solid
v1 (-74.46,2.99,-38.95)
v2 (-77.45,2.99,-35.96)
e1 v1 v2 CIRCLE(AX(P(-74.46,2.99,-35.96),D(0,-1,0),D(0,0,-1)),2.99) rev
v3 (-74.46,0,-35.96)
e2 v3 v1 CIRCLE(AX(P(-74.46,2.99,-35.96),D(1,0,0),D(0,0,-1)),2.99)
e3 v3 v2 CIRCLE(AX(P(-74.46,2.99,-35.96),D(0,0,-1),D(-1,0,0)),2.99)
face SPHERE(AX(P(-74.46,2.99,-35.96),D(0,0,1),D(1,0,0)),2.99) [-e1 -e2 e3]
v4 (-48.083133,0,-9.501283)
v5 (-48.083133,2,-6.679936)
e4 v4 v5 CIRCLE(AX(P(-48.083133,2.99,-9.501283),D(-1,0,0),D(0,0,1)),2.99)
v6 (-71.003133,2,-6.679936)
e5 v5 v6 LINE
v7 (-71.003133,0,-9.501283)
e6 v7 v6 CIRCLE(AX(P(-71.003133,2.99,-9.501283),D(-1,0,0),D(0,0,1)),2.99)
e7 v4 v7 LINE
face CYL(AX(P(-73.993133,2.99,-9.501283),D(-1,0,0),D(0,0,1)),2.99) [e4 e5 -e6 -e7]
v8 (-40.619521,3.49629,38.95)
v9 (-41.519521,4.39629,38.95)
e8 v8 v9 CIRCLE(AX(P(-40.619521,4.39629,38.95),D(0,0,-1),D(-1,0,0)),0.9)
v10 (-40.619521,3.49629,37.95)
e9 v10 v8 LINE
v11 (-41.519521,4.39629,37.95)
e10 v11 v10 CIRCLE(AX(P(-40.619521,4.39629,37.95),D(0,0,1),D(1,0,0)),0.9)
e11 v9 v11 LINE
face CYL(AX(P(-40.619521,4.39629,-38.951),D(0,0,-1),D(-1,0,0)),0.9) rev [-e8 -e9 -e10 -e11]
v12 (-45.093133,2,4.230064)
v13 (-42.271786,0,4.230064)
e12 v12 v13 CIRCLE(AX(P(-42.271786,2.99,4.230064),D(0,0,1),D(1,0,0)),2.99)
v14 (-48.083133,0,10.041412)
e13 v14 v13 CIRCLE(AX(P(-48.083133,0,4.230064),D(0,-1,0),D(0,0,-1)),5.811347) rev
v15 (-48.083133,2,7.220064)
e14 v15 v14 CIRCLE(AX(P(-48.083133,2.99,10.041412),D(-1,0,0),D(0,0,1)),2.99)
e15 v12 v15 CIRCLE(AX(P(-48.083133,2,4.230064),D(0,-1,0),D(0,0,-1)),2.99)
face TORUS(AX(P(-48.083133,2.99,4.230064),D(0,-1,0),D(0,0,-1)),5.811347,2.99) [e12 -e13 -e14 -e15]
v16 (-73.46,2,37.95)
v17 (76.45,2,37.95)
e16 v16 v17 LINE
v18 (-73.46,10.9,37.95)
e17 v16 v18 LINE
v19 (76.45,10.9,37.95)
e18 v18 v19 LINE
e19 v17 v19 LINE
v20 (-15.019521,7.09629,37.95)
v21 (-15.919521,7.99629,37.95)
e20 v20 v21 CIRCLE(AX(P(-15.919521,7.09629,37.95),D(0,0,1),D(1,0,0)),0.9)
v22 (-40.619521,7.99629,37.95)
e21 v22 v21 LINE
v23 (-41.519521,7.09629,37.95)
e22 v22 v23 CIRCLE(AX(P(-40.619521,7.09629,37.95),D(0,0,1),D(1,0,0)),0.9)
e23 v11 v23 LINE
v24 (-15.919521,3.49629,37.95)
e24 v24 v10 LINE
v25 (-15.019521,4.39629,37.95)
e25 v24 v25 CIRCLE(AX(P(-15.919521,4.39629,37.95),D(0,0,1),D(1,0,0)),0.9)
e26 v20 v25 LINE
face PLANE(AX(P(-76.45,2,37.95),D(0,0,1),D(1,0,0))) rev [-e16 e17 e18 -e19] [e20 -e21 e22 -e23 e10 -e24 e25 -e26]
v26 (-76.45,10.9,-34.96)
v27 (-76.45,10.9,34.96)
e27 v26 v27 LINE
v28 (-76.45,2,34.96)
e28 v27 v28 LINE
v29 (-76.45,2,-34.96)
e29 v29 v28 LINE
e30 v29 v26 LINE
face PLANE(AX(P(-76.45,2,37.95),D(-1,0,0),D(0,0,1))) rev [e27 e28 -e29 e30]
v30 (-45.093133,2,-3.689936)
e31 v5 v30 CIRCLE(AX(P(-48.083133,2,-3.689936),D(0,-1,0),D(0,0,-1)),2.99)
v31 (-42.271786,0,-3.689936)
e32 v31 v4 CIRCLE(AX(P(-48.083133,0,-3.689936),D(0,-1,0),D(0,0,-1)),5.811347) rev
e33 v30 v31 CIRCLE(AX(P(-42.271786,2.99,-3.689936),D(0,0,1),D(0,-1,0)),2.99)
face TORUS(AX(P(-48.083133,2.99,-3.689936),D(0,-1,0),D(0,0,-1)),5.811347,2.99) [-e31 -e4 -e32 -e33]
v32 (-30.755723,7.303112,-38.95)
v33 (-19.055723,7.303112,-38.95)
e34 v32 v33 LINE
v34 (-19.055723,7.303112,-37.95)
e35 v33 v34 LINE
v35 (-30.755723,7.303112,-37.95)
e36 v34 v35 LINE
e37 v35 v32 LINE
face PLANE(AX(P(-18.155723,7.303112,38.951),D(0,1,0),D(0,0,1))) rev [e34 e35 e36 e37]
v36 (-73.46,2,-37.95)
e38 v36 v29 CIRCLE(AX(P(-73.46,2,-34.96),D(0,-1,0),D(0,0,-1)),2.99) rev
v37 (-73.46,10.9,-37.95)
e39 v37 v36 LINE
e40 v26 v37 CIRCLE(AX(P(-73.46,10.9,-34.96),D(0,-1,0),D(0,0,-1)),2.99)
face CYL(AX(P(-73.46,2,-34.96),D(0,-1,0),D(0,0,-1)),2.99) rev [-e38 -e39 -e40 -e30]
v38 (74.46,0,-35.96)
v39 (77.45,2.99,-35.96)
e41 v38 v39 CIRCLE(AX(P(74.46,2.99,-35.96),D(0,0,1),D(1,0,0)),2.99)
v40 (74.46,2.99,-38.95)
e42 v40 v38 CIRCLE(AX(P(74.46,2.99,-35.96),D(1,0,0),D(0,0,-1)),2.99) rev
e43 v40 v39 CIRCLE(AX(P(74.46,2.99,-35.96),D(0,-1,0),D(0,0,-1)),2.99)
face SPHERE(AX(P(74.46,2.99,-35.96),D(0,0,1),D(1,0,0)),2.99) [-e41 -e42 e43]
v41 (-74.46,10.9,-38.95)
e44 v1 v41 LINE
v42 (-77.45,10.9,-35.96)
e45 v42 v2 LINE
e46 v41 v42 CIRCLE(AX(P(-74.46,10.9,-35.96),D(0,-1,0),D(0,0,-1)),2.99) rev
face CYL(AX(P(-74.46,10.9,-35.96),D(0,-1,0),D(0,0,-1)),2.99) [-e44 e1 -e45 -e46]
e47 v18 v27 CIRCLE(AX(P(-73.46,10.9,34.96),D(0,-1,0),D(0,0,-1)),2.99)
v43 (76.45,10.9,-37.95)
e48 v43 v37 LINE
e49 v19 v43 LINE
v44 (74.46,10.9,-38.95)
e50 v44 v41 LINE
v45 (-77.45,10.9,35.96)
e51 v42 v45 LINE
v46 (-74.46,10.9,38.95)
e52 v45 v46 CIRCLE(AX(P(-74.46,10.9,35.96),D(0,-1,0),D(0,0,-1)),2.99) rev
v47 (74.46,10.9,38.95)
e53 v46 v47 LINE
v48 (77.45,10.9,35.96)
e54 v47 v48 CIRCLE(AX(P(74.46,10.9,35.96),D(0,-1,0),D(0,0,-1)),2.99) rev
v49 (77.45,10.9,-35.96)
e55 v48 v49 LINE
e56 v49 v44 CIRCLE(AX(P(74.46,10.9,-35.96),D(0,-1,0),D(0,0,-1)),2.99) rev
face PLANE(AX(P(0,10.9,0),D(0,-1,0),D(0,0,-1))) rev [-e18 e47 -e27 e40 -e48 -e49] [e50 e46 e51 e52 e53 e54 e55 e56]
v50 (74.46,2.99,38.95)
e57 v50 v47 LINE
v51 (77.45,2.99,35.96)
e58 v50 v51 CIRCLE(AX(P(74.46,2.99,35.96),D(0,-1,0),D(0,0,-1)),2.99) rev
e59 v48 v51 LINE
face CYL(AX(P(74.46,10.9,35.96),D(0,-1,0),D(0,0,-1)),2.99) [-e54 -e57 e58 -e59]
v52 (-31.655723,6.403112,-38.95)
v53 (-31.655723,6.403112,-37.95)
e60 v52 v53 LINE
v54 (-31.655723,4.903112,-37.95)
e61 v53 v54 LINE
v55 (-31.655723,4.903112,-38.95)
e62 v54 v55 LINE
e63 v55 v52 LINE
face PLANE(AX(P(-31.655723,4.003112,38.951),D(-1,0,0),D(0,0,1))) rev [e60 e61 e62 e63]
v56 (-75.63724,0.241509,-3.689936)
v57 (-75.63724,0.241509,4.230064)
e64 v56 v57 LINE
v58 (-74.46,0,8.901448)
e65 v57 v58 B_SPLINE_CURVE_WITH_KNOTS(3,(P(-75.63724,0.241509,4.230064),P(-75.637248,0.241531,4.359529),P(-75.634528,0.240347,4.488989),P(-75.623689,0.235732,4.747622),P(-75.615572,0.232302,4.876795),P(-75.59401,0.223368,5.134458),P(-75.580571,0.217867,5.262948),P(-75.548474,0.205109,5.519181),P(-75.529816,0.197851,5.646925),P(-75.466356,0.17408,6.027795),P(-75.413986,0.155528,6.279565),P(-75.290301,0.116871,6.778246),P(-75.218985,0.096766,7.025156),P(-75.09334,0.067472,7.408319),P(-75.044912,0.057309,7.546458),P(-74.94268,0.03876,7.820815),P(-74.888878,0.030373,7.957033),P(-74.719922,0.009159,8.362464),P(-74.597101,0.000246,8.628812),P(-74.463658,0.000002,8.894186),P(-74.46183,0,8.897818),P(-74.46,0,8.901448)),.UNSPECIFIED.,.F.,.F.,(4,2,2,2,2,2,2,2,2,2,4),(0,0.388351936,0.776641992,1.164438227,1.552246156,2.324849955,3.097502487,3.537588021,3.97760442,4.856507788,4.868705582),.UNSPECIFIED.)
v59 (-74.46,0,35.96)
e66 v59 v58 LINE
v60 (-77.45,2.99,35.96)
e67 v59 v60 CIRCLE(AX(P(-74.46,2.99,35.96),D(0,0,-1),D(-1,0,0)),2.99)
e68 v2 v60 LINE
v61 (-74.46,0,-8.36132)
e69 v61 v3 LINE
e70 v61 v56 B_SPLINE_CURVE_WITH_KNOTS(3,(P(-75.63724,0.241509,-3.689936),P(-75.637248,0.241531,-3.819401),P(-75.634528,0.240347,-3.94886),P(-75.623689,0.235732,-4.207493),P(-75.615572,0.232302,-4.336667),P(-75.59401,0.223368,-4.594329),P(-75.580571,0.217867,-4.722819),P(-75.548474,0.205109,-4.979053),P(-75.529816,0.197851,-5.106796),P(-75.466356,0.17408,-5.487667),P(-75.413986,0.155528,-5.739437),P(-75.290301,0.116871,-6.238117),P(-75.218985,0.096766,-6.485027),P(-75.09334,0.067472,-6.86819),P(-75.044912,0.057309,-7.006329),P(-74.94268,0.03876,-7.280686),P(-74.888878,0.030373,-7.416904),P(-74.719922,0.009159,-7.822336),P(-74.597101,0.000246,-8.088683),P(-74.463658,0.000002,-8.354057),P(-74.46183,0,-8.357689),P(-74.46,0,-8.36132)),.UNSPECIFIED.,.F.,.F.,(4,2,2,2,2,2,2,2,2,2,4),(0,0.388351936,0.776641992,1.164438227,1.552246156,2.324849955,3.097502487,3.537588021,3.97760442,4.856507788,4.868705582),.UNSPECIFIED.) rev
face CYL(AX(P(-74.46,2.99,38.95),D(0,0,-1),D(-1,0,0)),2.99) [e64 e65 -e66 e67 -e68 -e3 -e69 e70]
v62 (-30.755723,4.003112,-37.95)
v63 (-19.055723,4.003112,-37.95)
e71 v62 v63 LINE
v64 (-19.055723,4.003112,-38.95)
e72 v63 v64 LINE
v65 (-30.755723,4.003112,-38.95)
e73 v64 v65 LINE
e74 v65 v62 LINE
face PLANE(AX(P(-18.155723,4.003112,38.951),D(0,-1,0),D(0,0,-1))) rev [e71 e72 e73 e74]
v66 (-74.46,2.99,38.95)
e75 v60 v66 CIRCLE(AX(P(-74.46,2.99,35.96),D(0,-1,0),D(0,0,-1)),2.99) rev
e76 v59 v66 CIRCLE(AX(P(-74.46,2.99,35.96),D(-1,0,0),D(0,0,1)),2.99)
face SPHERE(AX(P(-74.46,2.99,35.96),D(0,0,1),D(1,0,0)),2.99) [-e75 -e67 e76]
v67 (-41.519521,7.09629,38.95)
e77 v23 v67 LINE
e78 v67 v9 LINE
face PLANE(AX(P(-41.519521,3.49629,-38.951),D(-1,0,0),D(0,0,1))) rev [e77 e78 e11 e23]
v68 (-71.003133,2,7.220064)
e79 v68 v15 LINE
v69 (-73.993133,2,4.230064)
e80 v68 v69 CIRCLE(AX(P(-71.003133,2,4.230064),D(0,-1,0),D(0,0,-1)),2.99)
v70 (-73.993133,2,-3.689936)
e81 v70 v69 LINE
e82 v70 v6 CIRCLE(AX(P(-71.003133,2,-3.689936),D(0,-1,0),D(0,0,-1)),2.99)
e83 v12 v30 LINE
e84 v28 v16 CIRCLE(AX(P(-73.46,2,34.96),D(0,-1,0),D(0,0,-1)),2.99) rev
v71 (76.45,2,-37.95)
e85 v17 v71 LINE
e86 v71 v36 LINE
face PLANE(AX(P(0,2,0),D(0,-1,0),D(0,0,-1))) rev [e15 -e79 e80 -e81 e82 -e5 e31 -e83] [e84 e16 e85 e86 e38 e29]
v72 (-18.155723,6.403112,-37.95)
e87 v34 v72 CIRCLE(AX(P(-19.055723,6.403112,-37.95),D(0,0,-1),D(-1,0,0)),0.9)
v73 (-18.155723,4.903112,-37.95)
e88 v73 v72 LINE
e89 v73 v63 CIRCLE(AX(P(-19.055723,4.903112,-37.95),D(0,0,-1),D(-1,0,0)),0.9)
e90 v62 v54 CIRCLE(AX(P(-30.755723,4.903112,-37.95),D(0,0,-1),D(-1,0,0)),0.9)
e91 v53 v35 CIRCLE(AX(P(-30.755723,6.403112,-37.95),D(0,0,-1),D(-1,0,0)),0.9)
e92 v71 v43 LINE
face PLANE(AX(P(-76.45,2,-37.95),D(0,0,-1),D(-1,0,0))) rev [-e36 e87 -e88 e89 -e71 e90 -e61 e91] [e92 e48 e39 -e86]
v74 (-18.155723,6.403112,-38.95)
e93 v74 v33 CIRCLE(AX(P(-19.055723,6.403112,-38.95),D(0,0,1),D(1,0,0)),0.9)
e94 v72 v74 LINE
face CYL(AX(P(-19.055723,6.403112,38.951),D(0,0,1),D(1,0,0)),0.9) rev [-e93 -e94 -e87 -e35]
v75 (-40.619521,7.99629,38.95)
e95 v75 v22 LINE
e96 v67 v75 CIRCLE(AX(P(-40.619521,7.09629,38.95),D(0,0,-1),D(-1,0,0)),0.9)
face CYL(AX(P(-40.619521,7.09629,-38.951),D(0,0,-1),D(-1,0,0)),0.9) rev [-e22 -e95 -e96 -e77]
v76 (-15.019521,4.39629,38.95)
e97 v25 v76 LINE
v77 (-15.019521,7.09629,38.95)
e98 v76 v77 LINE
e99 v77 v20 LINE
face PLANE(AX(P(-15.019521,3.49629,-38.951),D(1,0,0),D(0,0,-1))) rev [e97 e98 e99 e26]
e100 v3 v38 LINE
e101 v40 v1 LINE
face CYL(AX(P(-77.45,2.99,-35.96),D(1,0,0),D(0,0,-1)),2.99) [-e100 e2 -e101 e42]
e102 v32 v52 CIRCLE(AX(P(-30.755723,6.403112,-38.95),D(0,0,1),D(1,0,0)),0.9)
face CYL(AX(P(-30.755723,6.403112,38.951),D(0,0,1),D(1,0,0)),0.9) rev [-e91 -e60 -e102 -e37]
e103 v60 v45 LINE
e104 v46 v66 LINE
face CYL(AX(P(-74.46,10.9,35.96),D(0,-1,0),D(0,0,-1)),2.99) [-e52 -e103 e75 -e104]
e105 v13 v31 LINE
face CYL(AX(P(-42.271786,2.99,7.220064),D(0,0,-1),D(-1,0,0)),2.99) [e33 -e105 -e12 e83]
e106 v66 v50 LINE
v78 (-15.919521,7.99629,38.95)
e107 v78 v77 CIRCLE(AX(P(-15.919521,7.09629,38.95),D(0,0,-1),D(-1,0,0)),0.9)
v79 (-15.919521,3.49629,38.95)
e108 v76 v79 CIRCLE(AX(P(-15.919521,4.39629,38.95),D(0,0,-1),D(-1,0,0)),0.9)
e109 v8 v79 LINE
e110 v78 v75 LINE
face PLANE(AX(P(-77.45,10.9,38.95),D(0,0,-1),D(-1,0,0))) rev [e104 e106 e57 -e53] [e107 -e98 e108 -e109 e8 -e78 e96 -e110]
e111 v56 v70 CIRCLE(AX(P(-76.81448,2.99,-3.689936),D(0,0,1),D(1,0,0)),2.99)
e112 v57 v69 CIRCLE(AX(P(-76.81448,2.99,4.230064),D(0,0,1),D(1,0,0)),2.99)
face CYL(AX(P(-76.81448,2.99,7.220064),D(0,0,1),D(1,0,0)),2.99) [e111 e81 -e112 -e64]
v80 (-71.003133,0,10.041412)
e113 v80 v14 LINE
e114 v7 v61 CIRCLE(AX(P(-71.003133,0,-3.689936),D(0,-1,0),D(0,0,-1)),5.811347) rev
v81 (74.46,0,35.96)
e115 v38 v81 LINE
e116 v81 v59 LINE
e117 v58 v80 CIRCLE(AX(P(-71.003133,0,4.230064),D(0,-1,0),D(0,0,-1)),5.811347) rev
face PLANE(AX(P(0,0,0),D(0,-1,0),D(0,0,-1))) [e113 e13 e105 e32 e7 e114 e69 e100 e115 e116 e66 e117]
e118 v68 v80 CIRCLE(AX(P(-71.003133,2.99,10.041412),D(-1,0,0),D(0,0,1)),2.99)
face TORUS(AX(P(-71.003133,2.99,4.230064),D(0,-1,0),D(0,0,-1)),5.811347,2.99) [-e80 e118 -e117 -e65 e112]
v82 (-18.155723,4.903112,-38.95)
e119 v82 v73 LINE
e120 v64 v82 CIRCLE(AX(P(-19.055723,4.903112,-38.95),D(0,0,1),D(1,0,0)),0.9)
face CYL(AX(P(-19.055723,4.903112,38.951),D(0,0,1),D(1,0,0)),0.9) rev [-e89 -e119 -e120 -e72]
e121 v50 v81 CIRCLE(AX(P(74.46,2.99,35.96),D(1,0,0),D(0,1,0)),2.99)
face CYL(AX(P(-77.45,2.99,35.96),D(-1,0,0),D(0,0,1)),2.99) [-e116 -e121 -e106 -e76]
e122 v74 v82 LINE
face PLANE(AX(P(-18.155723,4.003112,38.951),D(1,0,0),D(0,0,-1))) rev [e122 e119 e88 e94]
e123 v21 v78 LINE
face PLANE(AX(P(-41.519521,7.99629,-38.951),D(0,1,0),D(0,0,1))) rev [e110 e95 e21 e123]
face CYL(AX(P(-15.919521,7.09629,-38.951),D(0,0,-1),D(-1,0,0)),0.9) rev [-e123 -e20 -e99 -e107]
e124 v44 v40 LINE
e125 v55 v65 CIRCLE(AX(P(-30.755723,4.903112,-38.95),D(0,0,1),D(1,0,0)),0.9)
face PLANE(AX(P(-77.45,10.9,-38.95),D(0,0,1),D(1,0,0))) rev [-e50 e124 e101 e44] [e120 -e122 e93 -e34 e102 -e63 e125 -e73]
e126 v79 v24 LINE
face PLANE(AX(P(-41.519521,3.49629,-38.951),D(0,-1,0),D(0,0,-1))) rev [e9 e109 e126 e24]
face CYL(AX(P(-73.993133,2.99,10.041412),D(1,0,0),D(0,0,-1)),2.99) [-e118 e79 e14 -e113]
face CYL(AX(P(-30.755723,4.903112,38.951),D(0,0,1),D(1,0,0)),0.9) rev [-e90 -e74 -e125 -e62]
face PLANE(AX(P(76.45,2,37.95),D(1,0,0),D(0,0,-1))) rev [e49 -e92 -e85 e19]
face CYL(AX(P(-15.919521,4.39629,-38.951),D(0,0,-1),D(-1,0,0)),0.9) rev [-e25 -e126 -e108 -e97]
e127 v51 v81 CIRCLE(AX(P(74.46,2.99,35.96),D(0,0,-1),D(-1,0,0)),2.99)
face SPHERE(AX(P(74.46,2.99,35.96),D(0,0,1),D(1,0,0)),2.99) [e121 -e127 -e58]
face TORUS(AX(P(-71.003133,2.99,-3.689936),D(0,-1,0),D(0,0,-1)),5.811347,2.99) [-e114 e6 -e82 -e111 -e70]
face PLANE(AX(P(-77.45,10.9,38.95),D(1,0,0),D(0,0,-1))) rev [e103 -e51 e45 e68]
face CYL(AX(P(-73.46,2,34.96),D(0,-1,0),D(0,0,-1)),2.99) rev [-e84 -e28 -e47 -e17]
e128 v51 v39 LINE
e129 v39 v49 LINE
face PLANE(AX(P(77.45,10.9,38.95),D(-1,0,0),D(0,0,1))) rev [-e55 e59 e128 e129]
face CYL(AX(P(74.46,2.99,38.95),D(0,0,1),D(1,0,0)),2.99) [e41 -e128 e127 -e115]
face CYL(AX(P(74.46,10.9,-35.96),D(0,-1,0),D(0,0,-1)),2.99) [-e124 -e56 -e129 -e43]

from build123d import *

# Parameters (mm, degrees)
SKETCH1_W           = 154.9
SKETCH1_H           = 77.9
BOSS_EXTRUDE1_DEPTH = 10.9
SKETCH8_W           = 152.9
SKETCH8_H           = 75.9
CUT_EXTRUDE3_DEPTH  = 8.9
FILLET6_R           = 2.99
FILLET7_R           = 2.99
FILLET8_R           = 2.99
FILLET9_R           = 2.99
FILLET10_R          = 2.99
FILLET11_R          = 2.99
FILLET12_R          = 2.99
FILLET13_R          = 2.99
SKETCH12_W          = 28.9
SKETCH12_H          = 13.9
CUT_EXTRUDE4_DEPTH  = 88.148235782
FILLET15_R          = 2.99
FILLET16_R          = 2.99
FILLET17_R          = 2.99
FILLET18_R          = 2.99
CUT_EXTRUDE8_REACH  = 112.389
SKETCH15_W          = 26.5
SKETCH15_H          = 4.5
CUT_EXTRUDE9_REACH  = 112.389
SKETCH16_W          = 13.5
SKETCH16_H          = 3.3
FILLET19_R          = 2.99
FILLET22_R          = 0.9
FILLET23_R          = 0.9
FILLET24_R          = 0.9
FILLET25_R          = 0.9
FILLET29_R          = 0.9
FILLET39_R          = 2.99
SKETCH6_W           = 152.9
SKETCH6_H           = 75.9
CUT_EXTRUDE2_DEPTH  = 8.9
FILLET4_R           = 2.99
FILLET5_R           = 2.99


with BuildPart() as part:
    # Sketch1 → Boss-Extrude1 (new body)
    with BuildSketch(Plane(origin=(0, 0, 0), x_dir=(1, 0, 0), z_dir=(0, 1, 0))):
        Rectangle(SKETCH1_W, SKETCH1_H)
    extrude(amount=BOSS_EXTRUDE1_DEPTH)

    # Sketch8 → Cut-Extrude3 (cut)
    with BuildSketch(Plane(origin=(0, 10.9, 0), x_dir=(1, 0, 0), z_dir=(0, 1, 0))):
        Rectangle(SKETCH8_W, SKETCH8_H)
    extrude(amount=-CUT_EXTRUDE3_DEPTH, mode=Mode.SUBTRACT)

    # Fillet6
    fillet6_edges = [part.edges().sort_by_distance(p)[0] for p in [
        (-76.45, 6.45, -37.95),
    ]]
    fillet(fillet6_edges, radius=FILLET6_R)

    # Fillet7
    fillet7_edges = [part.edges().sort_by_distance(p)[0] for p in [
        (-76.45, 6.45, 37.95),
    ]]
    fillet(fillet7_edges, radius=FILLET7_R)

    # Fillet8
    fillet8_edges = [part.edges().sort_by_distance(p)[0] for p in [
        (76.45, 6.45, -37.95),
    ]]
    fillet(fillet8_edges, radius=FILLET8_R)

    # Fillet9
    fillet9_edges = [part.edges().sort_by_distance(p)[0] for p in [
        (76.45, 6.45, 37.95),
    ]]
    fillet(fillet9_edges, radius=FILLET9_R)

    # Fillet10
    fillet10_edges = [part.edges().sort_by_distance(p)[0] for p in [
        (77.45, 5.45, 38.95),
    ]]
    fillet(fillet10_edges, radius=FILLET10_R)

    # Fillet11
    fillet11_edges = [part.edges().sort_by_distance(p)[0] for p in [
        (-77.45, 5.45, 38.95),
    ]]
    fillet(fillet11_edges, radius=FILLET11_R)

    # Fillet12
    fillet12_edges = [part.edges().sort_by_distance(p)[0] for p in [
        (-77.45, 5.45, -38.95),
    ]]
    fillet(fillet12_edges, radius=FILLET12_R)

    # Fillet13
    fillet13_edges = [part.edges().sort_by_distance(p)[0] for p in [
        (1.495, 0, -38.95),
        (77.45, 0, -1.495),
        (76.574249276, 0, 38.074249276),
        (0, 0, 38.95),
        (-76.574249276, 0, 38.074249276),
        (-77.45, 0, 0),
        (-76.574249276, 0, -38.074249276),
    ]]
    fillet(fillet13_edges, radius=FILLET13_R)

    # Sketch12 → Cut-Extrude4 (cut, through all)
    with BuildSketch(Plane(origin=(0, 2, 0), x_dir=(1, 0, 0), z_dir=(0, 1, 0))):
        with Locations((-59.543133303, -0.270064355)):
            Rectangle(SKETCH12_W, SKETCH12_H)
    extrude(amount=-CUT_EXTRUDE4_DEPTH, mode=Mode.SUBTRACT)

    # Fillet15
    fillet15_edges = [part.edges().sort_by_distance(p)[0] for p in [
        (-73.993133303, 1, -6.679935645),
    ]]
    fillet(fillet15_edges, radius=FILLET15_R)

    # Fillet16
    fillet16_edges = [part.edges().sort_by_distance(p)[0] for p in [
        (-73.993133303, 1, 7.220064355),
    ]]
    fillet(fillet16_edges, radius=FILLET16_R)

    # Fillet17
    fillet17_edges = [part.edges().sort_by_distance(p)[0] for p in [
        (-45.093133303, 1, 7.220064355),
    ]]
    fillet(fillet17_edges, radius=FILLET17_R)

    # Fillet18
    fillet18_edges = [part.edges().sort_by_distance(p)[0] for p in [
        (-45.093133303, 1, -6.679935645),
    ]]
    fillet(fillet18_edges, radius=FILLET18_R)

    # Sketch15 → Cut-Extrude8 (cut, up to next)
    with BuildSketch(Plane.XY.offset(38.95), mode=Mode.PRIVATE) as cut_extrude8_sk1:
        with Locations((-28.269520984, 5.746289853)):
            Rectangle(SKETCH15_W, SKETCH15_H)
    cut_extrude8_tool1 = extrude(cut_extrude8_sk1.sketch, amount=-CUT_EXTRUDE8_REACH, mode=Mode.PRIVATE) & part.part
    add(cut_extrude8_tool1.solids().sort_by_distance((-28.269521, 5.74629, 38.95))[0], mode=Mode.SUBTRACT)

    # Sketch16 → Cut-Extrude9 (cut, up to next)
    with BuildSketch(Plane(origin=(0, 0, -38.95), x_dir=(-1, 0, 0), z_dir=(0, 0, -1)), mode=Mode.PRIVATE) as cut_extrude9_sk1:
        with Locations((24.905722524, 5.653111576)):
            Rectangle(SKETCH16_W, SKETCH16_H)
    cut_extrude9_tool1 = extrude(cut_extrude9_sk1.sketch, amount=-CUT_EXTRUDE9_REACH, mode=Mode.PRIVATE) & part.part
    add(cut_extrude9_tool1.solids().sort_by_distance((-24.905723, 5.653112, -38.95))[0], mode=Mode.SUBTRACT)

    # Fillet19
    # the kernel refuses this fillet: 2.99 mm, written as the material it takes off along each edge
    with BuildSketch(Plane(origin=(-71.003133303, 0, 4.230064355), x_dir=(-1, 0, 0), z_dir=(0, 0, -1))) as fillet19_piece_1:
        with BuildLine():
            CenterArc((5.811347196, 2.99), FILLET19_R, 199.335777997, 70.664222003)
            Line((2.99, 2), (2.933573056, 1.9802))
            ThreePointArc((2.933573056, 1.9802), (2.9302, 1), (2.9302, 0))
            Line((2.9302, 0), (2.99, -0.0598))
            Line((2.99, -0.0598), (5.811347196, -0.0598))
            Line((5.811347196, -0.0598), (5.811347196, 0))
        make_face()
    revolve(axis=Axis((-71.003133303, 0, 4.230064355), (0, 1, 0)), revolution_arc=90, mode=Mode.SUBTRACT)
    with BuildSketch(Plane(origin=(-73.993133303, 0, -3.689935645), x_dir=(-1, 0, 0), z_dir=(0, 0, 1)), Plane(origin=(-45.093133303, 0, 4.230064355), x_dir=(1, 0, 0), z_dir=(0, 0, -1))) as fillet19_piece_2:
        with BuildLine():
            CenterArc((2.821347196, -2.99), FILLET19_R, 90, 70.664222003)
            Line((0, -2), (-0.056426944, -1.9802))
            ThreePointArc((-0.056426944, -1.9802), (-0.0598, -1), (-0.0598, 0))
            Line((-0.0598, 0), (0, 0.0598))
            Line((0, 0.0598), (2.821347196, 0.0598))
            Line((2.821347196, 0.0598), (2.821347196, 0))
        make_face()
    extrude(amount=7.92, mode=Mode.SUBTRACT)
    with BuildSketch(Plane(origin=(-71.003133303, 0, -3.689935645), x_dir=(0, 0, -1), z_dir=(1, 0, 0))) as fillet19_piece_3:
        with BuildLine():
            CenterArc((5.811347196, 2.99), FILLET19_R, 199.335777997, 70.664222003)
            Line((2.99, 2), (2.933573056, 1.9802))
            ThreePointArc((2.933573056, 1.9802), (2.9302, 1), (2.9302, 0))
            Line((2.9302, 0), (2.99, -0.0598))
            Line((2.99, -0.0598), (5.811347196, -0.0598))
            Line((5.811347196, -0.0598), (5.811347196, 0))
        make_face()
    revolve(axis=Axis((-71.003133303, 0, -3.689935645), (0, 1, 0)), revolution_arc=90, mode=Mode.SUBTRACT)
    with BuildSketch(Plane(origin=(-48.083133303, 0, -6.679935645), x_dir=(0, 0, -1), z_dir=(-1, 0, 0)), Plane(origin=(-71.003133303, 0, 7.220064355), x_dir=(0, 0, 1), z_dir=(1, 0, 0))) as fillet19_piece_4:
        with BuildLine():
            CenterArc((2.821347196, -2.99), FILLET19_R, 90, 70.664222003)
            Line((0, -2), (-0.056426944, -1.9802))
            ThreePointArc((-0.056426944, -1.9802), (-0.0598, -1), (-0.0598, 0))
            Line((-0.0598, 0), (0, 0.0598))
            Line((0, 0.0598), (2.821347196, 0.0598))
            Line((2.821347196, 0.0598), (2.821347196, 0))
        make_face()
    extrude(amount=22.92, mode=Mode.SUBTRACT)
    with BuildSketch(Plane(origin=(-48.083133303, 0, -3.689935645), x_dir=(1, 0, 0), z_dir=(0, 0, 1))) as fillet19_piece_5:
        with BuildLine():
            CenterArc((5.811347196, 2.99), FILLET19_R, 199.335777997, 70.664222003)
            Line((2.99, 2), (2.933573056, 1.9802))
            ThreePointArc((2.933573056, 1.9802), (2.9302, 1), (2.9302, 0))
            Line((2.9302, 0), (2.99, -0.0598))
            Line((2.99, -0.0598), (5.811347196, -0.0598))
            Line((5.811347196, -0.0598), (5.811347196, 0))
        make_face()
    revolve(axis=Axis((-48.083133303, 0, -3.689935645), (0, 1, 0)), revolution_arc=90, mode=Mode.SUBTRACT)
    with BuildSketch(Plane(origin=(-48.083133303, 0, 4.230064355), x_dir=(0, 0, 1), z_dir=(-1, 0, 0))) as fillet19_piece_6:
        with BuildLine():
            CenterArc((5.811347196, 2.99), FILLET19_R, 199.335777997, 70.664222003)
            Line((2.99, 2), (2.933573056, 1.9802))
            ThreePointArc((2.933573056, 1.9802), (2.9302, 1), (2.9302, 0))
            Line((2.9302, 0), (2.99, -0.0598))
            Line((2.99, -0.0598), (5.811347196, -0.0598))
            Line((5.811347196, -0.0598), (5.811347196, 0))
        make_face()
    revolve(axis=Axis((-48.083133303, 0, 4.230064355), (0, 1, 0)), revolution_arc=90, mode=Mode.SUBTRACT)

    # Fillet22
    fillet22_edges = [part.edges().sort_by_distance(p)[0] for p in [
        (-15.019520984, 7.996289853, 38.45),
    ]]
    fillet(fillet22_edges, radius=FILLET22_R)

    # Fillet23
    fillet23_edges = [part.edges().sort_by_distance(p)[0] for p in [
        (-41.519520984, 7.996289853, 38.45),
    ]]
    fillet(fillet23_edges, radius=FILLET23_R)

    # Fillet24
    fillet24_edges = [part.edges().sort_by_distance(p)[0] for p in [
        (-15.019520984, 3.496289853, 38.45),
    ]]
    fillet(fillet24_edges, radius=FILLET24_R)

    # Fillet25
    fillet25_edges = [part.edges().sort_by_distance(p)[0] for p in [
        (-41.519520984, 3.496289853, 38.45),
    ]]
    fillet(fillet25_edges, radius=FILLET25_R)

    # Fillet29
    fillet29_edges = [part.edges().sort_by_distance(p)[0] for p in [
        (-31.655722524, 7.303111576, -38.45),
        (-31.655722524, 4.003111576, -38.45),
        (-18.155722524, 4.003111576, -38.45),
        (-18.155722524, 7.303111576, -38.45),
    ]]
    fillet(fillet29_edges, radius=FILLET29_R)

    # Fillet39
    # the kernel refuses this fillet: 2.99 mm, written as the material it takes off along each edge
    with BuildSketch(Plane(origin=(74.46, 2.99, -35.96), x_dir=(1, 0, 0), z_dir=(0, 0, -1))) as fillet39_piece_1_section:
        Polygon((0, 0), (FILLET39_R, 0), (FILLET39_R, FILLET39_R), (0, FILLET39_R), align=None)
    fillet39_piece_1 = extrude(amount=FILLET39_R, mode=Mode.PRIVATE)
    fillet39_piece_1 = fillet39_piece_1 - Plane(origin=(74.46, 2.99, -35.96), x_dir=(-0.7071067811865475, 0.7071067811865475, 0), z_dir=(0, 0, -1)) * Sphere(FILLET39_R, mode=Mode.PRIVATE)
    add(fillet39_piece_1, mode=Mode.SUBTRACT)
    with BuildSketch(Plane(origin=(77.45, 2.99, -38.95), x_dir=(-1, 0, 0), z_dir=(0, 1, 0))) as fillet39_piece_2:
        with BuildLine():
            CenterArc((FILLET39_R, FILLET39_R), FILLET39_R, 180, 90)
            Line((0, FILLET39_R), (0, 0))
            Line((0, 0), (FILLET39_R, 0))
        make_face()
    extrude(amount=15.385, mode=Mode.SUBTRACT)

    # Sketch6 → Cut-Extrude2 (cut)
    with BuildSketch(Plane(origin=(0, 10.9, 0), x_dir=(1, 0, 0), z_dir=(0, 1, 0))):
        Rectangle(SKETCH6_W, SKETCH6_H)
    extrude(amount=-CUT_EXTRUDE2_DEPTH, mode=Mode.SUBTRACT)

    # Fillet4
    fillet4_edges = [part.edges().sort_by_distance(p)[0] for p in [
        (-76.45, 6.45, -37.95),
    ]]
    fillet(fillet4_edges, radius=FILLET4_R)

    # Fillet5
    fillet5_edges = [part.edges().sort_by_distance(p)[0] for p in [
        (-76.45, 6.45, 37.95),
    ]]
    fillet(fillet5_edges, radius=FILLET5_R)


solid = part.part
